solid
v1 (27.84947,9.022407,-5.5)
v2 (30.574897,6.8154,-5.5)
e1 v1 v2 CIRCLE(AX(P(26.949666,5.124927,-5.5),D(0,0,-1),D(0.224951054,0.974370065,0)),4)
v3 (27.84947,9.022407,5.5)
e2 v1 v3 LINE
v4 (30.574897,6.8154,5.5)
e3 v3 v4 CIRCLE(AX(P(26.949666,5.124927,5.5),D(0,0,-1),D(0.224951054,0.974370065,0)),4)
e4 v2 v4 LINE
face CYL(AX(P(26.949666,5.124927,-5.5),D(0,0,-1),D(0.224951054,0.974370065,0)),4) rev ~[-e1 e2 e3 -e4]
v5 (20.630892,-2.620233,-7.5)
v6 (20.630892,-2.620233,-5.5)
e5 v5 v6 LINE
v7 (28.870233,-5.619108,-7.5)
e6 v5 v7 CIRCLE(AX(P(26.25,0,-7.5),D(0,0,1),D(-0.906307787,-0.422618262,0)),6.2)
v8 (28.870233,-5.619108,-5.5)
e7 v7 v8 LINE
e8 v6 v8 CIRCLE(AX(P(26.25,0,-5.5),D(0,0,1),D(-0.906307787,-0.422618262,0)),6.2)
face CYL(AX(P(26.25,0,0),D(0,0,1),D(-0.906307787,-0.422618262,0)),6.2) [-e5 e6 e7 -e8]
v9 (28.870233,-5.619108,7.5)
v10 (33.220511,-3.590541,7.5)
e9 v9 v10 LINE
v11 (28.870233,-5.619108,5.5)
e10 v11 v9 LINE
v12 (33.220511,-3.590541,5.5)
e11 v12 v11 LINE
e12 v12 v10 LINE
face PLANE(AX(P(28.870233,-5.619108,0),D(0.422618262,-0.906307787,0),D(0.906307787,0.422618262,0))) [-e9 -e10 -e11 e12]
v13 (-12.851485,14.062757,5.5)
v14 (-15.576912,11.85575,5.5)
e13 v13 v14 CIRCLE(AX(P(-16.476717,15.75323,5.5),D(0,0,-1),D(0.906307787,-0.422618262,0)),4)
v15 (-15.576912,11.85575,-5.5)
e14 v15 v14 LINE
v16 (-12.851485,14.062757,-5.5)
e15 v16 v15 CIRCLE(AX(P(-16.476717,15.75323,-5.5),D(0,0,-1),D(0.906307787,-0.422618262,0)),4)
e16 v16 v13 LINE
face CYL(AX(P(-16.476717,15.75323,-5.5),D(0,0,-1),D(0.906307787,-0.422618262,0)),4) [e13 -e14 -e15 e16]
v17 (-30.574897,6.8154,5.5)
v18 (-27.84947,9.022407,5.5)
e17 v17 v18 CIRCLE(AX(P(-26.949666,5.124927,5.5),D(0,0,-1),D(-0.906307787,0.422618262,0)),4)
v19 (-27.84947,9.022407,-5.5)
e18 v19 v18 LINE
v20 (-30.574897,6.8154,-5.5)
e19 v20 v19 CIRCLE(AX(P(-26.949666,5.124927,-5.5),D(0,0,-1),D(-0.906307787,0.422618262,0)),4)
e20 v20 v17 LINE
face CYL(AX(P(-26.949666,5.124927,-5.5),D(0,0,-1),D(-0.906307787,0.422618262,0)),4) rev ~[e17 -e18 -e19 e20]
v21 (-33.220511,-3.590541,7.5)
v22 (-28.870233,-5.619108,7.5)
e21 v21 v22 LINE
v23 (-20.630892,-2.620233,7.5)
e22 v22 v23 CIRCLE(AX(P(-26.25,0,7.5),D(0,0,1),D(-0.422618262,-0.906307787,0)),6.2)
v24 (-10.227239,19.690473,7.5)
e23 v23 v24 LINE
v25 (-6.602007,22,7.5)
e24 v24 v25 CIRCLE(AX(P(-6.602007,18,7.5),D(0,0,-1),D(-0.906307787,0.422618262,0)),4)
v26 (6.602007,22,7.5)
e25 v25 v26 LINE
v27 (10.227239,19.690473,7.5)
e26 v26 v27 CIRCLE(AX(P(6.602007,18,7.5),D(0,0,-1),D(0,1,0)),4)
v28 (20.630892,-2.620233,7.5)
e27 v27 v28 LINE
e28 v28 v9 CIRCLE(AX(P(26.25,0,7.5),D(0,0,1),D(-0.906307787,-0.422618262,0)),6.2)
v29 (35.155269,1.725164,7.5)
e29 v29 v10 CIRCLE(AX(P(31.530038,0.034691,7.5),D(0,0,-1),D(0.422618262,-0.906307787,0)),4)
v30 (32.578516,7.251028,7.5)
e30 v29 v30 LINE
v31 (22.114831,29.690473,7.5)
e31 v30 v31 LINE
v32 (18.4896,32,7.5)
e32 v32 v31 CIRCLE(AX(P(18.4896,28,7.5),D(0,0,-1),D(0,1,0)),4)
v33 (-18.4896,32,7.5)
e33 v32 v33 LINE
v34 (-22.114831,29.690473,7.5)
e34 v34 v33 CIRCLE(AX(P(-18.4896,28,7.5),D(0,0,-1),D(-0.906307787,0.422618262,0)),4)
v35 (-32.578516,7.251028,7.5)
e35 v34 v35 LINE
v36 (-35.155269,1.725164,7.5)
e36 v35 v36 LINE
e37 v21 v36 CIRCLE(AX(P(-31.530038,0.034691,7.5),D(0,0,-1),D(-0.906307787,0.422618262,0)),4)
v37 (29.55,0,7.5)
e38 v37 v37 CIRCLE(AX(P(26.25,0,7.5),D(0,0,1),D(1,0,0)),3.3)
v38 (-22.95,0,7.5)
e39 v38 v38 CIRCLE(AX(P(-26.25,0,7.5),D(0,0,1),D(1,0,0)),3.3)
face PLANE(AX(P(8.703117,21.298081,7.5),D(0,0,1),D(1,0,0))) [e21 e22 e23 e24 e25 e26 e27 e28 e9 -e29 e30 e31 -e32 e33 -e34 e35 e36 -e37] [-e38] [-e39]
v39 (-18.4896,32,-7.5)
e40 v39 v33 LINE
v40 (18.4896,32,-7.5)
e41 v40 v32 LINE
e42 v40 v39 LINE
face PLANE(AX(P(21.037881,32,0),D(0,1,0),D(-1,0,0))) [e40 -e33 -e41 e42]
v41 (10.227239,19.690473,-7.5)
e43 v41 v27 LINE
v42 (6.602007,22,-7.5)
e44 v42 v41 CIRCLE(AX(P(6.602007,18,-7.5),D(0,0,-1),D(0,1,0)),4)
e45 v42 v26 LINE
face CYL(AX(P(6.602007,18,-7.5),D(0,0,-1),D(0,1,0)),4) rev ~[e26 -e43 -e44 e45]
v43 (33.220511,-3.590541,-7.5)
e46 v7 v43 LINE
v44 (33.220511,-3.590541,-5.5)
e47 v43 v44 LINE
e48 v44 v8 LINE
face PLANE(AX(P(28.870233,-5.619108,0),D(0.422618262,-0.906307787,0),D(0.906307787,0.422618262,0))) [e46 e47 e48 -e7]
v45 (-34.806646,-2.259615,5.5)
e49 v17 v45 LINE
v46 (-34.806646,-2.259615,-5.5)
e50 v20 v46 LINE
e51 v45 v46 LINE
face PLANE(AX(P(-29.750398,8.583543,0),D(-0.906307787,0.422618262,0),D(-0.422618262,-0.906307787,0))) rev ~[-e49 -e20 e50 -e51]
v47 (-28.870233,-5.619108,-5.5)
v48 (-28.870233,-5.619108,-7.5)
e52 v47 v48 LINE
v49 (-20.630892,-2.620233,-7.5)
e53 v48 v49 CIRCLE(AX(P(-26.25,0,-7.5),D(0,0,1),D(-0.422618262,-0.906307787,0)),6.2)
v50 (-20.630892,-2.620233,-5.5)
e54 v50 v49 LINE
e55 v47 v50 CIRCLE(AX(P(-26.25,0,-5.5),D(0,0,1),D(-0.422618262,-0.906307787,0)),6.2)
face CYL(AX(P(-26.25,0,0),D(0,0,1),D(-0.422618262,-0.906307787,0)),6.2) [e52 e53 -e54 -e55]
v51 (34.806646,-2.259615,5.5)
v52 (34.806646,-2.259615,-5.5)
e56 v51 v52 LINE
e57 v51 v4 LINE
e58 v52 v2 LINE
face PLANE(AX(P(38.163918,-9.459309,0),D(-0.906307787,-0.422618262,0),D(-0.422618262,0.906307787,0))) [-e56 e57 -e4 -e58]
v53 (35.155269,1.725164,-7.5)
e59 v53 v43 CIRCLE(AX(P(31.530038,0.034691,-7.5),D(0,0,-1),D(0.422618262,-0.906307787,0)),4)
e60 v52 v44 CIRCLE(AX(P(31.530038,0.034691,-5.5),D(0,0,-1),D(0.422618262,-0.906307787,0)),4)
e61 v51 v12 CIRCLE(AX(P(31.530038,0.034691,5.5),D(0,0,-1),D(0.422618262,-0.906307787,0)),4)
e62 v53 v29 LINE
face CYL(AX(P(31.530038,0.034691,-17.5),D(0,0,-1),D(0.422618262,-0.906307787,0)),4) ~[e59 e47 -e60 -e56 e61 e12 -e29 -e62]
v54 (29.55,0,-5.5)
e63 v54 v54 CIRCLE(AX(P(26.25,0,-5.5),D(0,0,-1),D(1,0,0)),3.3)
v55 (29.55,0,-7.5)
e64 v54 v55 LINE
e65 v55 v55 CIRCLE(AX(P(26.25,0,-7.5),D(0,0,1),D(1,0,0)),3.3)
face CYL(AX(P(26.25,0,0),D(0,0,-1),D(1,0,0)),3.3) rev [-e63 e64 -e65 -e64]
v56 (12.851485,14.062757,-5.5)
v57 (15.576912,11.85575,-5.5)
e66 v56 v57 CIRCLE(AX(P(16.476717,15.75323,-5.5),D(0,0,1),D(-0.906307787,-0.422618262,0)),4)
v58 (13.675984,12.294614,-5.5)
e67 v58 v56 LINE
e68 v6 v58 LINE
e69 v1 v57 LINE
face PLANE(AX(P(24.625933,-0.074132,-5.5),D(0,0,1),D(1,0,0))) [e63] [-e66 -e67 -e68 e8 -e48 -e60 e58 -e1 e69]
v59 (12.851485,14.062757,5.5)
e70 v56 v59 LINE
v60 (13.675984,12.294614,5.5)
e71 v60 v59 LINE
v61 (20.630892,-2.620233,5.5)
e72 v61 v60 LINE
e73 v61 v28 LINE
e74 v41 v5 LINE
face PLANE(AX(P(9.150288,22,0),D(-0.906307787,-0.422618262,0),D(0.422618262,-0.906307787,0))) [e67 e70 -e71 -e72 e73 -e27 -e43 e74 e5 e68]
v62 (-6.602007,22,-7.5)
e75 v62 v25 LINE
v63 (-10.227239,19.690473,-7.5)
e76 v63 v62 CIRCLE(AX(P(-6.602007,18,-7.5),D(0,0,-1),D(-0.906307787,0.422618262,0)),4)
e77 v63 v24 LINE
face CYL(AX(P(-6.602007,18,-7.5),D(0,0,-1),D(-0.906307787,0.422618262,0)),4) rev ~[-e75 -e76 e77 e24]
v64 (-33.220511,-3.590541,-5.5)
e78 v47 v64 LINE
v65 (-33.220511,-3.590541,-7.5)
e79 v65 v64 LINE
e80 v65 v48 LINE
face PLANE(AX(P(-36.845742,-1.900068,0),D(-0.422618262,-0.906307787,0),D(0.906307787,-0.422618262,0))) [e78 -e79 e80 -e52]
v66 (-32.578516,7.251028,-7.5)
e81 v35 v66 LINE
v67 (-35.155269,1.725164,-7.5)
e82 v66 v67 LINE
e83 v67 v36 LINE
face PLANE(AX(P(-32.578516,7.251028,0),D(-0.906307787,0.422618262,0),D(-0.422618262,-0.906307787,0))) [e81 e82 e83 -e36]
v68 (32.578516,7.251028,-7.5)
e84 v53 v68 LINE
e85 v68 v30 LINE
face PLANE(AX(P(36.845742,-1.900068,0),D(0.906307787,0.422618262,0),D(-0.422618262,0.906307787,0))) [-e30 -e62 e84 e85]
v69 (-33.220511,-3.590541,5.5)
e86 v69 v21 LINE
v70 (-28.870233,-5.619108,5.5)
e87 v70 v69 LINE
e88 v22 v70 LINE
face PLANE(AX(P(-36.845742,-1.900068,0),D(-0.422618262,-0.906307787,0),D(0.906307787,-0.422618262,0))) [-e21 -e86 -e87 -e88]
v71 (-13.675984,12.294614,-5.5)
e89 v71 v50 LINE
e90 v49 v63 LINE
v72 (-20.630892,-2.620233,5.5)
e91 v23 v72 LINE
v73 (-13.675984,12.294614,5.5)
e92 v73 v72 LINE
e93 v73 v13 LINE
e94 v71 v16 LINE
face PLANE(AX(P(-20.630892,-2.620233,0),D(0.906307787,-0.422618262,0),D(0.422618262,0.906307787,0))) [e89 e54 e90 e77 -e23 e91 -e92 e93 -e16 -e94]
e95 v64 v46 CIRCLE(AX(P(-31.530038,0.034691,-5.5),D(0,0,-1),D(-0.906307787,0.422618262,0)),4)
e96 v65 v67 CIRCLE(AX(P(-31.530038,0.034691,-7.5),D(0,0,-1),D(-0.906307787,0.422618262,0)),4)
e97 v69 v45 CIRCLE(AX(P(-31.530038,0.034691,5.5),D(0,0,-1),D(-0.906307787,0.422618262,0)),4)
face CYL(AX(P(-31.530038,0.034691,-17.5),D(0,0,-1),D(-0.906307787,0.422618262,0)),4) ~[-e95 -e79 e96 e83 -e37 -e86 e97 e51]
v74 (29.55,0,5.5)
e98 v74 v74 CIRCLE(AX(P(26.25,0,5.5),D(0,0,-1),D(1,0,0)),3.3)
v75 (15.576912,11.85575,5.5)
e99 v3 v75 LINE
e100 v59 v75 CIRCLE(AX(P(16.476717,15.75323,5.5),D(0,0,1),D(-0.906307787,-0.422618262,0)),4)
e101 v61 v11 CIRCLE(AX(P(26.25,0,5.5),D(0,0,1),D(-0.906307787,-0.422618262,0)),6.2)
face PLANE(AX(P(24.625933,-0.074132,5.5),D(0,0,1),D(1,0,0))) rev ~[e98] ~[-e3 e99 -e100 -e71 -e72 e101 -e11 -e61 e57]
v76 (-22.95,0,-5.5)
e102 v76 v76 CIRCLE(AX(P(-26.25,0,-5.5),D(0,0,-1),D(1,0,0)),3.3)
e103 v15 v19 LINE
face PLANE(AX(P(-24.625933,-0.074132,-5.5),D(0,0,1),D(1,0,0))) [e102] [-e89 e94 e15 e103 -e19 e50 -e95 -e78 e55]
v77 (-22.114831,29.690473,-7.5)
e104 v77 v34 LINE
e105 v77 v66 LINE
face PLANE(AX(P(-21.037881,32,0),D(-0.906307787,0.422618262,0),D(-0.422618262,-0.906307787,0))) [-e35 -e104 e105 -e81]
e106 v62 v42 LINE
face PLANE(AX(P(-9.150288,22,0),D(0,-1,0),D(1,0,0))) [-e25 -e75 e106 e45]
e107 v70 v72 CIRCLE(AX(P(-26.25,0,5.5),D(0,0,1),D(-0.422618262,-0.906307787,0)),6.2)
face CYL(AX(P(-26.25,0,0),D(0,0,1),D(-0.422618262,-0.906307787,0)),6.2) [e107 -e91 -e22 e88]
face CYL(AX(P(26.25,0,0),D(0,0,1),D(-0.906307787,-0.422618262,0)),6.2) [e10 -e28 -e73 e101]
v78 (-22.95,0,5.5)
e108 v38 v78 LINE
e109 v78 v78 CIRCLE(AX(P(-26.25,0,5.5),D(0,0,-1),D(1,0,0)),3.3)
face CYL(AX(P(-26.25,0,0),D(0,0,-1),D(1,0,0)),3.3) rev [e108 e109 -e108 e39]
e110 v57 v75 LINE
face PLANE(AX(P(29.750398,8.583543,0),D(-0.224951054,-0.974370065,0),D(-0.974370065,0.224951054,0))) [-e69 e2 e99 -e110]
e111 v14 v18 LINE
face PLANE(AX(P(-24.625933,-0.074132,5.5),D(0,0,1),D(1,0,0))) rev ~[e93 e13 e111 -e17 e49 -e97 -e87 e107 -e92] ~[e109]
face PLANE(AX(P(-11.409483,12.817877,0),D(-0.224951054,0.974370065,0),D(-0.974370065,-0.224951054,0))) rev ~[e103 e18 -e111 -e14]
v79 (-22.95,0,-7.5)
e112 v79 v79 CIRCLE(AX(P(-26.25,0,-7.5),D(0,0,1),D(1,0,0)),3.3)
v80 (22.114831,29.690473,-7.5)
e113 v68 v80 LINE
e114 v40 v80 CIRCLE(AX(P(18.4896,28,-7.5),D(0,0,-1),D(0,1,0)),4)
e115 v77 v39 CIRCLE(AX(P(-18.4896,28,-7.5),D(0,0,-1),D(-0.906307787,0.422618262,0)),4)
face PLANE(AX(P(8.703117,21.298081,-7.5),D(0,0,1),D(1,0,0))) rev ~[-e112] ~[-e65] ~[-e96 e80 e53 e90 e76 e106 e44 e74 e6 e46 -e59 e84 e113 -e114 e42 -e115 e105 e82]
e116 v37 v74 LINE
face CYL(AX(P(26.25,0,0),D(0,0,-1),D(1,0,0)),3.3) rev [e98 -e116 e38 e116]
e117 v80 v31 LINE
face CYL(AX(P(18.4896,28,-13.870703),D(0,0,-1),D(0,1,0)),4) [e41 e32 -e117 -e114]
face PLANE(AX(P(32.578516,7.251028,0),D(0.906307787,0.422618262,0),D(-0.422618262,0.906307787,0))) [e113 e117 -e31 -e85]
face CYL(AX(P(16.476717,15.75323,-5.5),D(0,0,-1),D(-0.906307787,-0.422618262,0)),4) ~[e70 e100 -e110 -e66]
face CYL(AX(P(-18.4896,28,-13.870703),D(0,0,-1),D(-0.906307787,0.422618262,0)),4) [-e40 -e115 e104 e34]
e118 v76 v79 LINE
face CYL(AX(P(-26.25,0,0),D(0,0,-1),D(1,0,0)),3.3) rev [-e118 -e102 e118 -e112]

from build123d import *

# Parameters (mm, degrees)
F1_R        = 3.3
F2_DEPTH    = 7.5
F0_R        = 3.3
F3_DEPTH    = 7.501
F5_DEPTH    = 5.5
F6_T1_DEPTH = 15
F6_T3_DEPTH = 11
F6_T5_DEPTH = 11
F6_T7_DEPTH = 35
F6_T9_DEPTH = 27.7414052161


# Not quite as in the source:
# - a fillet or chamfer that OpenCascade refuses, or shapes differently, is made with other operations: its cross-section is extruded or revolved along the edge and cut away or added
# - a feature names something its author has since deleted; it is built from what else it names


with BuildPart() as f2:
    # F1 (on Top) → F2 (new body, symmetric)
    with BuildSketch(Plane.XY):
        with BuildLine():
            Line((-9.150288423, 22), (0, 22))
            Line((0, 22), (9.150288423, 22))
            Line((9.150288423, 22), (20.6308917204, -2.6202332228))
            ThreePointArc((20.6308917204, -2.6202332228), (24.1294751114, -5.8260942489), (28.8702332228, -5.6191082796))
            Line((28.8702332228, -5.6191082796), (36.8457417487, -1.9000675763))
            Line((36.8457417487, -1.9000675763), (32.5785159717, 7.2510276339))
            Line((32.5785159717, 7.2510276339), (21.0378806259, 32))
            Line((21.0378806259, 32), (0, 32))
            Line((0, 32), (-21.0378806259, 32))
            Line((-21.0378806259, 32), (-32.5785159717, 7.2510276339))
            Line((-32.5785159717, 7.2510276339), (-36.8457417487, -1.9000675763))
            Line((-36.8457417487, -1.9000675763), (-28.8702332228, -5.6191082796))
            ThreePointArc((-28.8702332228, -5.6191082796), (-24.1294751114, -5.8260942489), (-20.6308917204, -2.6202332228))
            Line((-20.6308917204, -2.6202332228), (-9.150288423, 22))
        make_face()
        with Locations((-26.25, 0)):
            Circle(F1_R, mode=Mode.SUBTRACT)
        with Locations((26.25, 0)):
            Circle(F1_R, mode=Mode.SUBTRACT)
    extrude(amount=F2_DEPTH, both=True)

    # F0 (on Top) → F3 (cut, through all)
    with BuildSketch(Plane.XY):
        with Locations((26.25, 0)):
            Circle(F0_R)
        with Locations((-26.25, 0)):
            Circle(F0_R)
    extrude(amount=F3_DEPTH, mode=Mode.SUBTRACT)

    # F4 (on Top) → F5 (cut, symmetric)
    with BuildSketch(Plane.XY):
        Polygon((38.163918051, -9.4593089454), (29.7503979029, 8.5835432382), (11.4094827275, 12.8178771483), (24.044580395, -14.2781772408), align=None)
        Polygon((-29.7503979029, 8.5835432382), (-38.163918051, -9.4593089454), (-24.044580395, -14.2781772408), (-11.4094827275, 12.8178771483), align=None)
    extrude(amount=F5_DEPTH, both=True, mode=Mode.SUBTRACT)

    # F6: fillet of radius 4 on 10 edges, made by hand

    # F6_s2 → F6_t1 (join)
    with BuildSketch(Plane.XY.offset(-7.5)):
        with BuildLine():
            ThreePointArc((6.6020073798, 22), (8.7512058132, 21.3735657833), (10.2272385279, 19.690473047))
            Line((10.2272385279, 19.690473047), (9.150288423, 22))
            Line((9.150288423, 22), (6.6020073798, 22))
        make_face()
        with BuildLine():
            ThreePointArc((-10.2272385279, 19.690473047), (-8.7512058132, 21.3735657833), (-6.6020073798, 22))
            Line((-6.6020073798, 22), (-9.150288423, 22))
            Line((-9.150288423, 22), (-10.2272385279, 19.690473047))
        make_face()
    extrude(amount=F6_T1_DEPTH)

    # F6_s4 → F6_t3 (join)
    with BuildSketch(Plane.XY.offset(-5.5)):
        with BuildLine():
            ThreePointArc((27.8494697672, 9.0224070783), (29.466947114, 8.233510665), (30.574896698, 6.8153998661))
            Line((30.574896698, 6.8153998661), (29.7503979029, 8.5835432382))
            Line((29.7503979029, 8.5835432382), (27.8494697672, 9.0224070783))
        make_face()
        with BuildLine():
            ThreePointArc((-30.574896698, 6.8153998661), (-29.466947114, 8.233510665), (-27.8494697672, 9.0224070783))
            Line((-27.8494697672, 9.0224070783), (-29.7503979029, 8.5835432382))
            Line((-29.7503979029, 8.5835432382), (-30.574896698, 6.8153998661))
        make_face()
    extrude(amount=F6_T3_DEPTH)

    # F6_s6 → F6_t5 (cut)
    with BuildSketch(Plane.XY.offset(-5.5)):
        with BuildLine():
            ThreePointArc((12.8514854221, 14.0627574212), (13.9594350061, 12.6446466223), (15.5769123529, 11.855750209))
            Line((15.5769123529, 11.855750209), (13.6759842172, 12.2946140492))
            Line((13.6759842172, 12.2946140492), (12.8514854221, 14.0627574212))
        make_face()
        with BuildLine():
            ThreePointArc((-12.8514854221, 14.0627574212), (-13.9594350061, 12.6446466223), (-15.5769123529, 11.855750209))
            Line((-15.5769123529, 11.855750209), (-13.6759842172, 12.2946140492))
            Line((-13.6759842172, 12.2946140492), (-12.8514854221, 14.0627574212))
        make_face()
    extrude(amount=F6_T5_DEPTH, mode=Mode.SUBTRACT)

    # F6_s8 → F6_t7 (cut)
    with BuildSketch(Plane.XY.offset(-17.5)):
        with BuildLine():
            ThreePointArc((33.2205106006, -3.5905406233), (35.2888080367, -1.3333900484), (35.1552687018, 1.7251635718))
            Line((35.1552687018, 1.7251635718), (36.8457417487, -1.9000675763))
            Line((36.8457417487, -1.9000675763), (33.2205106006, -3.5905406233))
        make_face()
        with BuildLine():
            ThreePointArc((-35.1552687018, 1.7251635718), (-35.2888080367, -1.3333900484), (-33.2205106006, -3.5905406233))
            Line((-33.2205106006, -3.5905406233), (-36.8457417487, -1.9000675763))
            Line((-36.8457417487, -1.9000675763), (-35.1552687018, 1.7251635718))
        make_face()
    extrude(amount=F6_T7_DEPTH, mode=Mode.SUBTRACT)

    # F6_s10 → F6_t9 (cut)
    with BuildSketch(Plane.XY.offset(-13.8707026081)):
        with BuildLine():
            ThreePointArc((18.4895995827, 32), (20.6387980161, 31.3735657833), (22.1148307308, 29.690473047))
            Line((22.1148307308, 29.690473047), (21.0378806259, 32))
            Line((21.0378806259, 32), (18.4895995827, 32))
        make_face()
        with BuildLine():
            ThreePointArc((-22.1148307308, 29.690473047), (-20.6387980161, 31.3735657833), (-18.4895995827, 32))
            Line((-18.4895995827, 32), (-21.0378806259, 32))
            Line((-21.0378806259, 32), (-22.1148307308, 29.690473047))
        make_face()
    extrude(amount=F6_T9_DEPTH, mode=Mode.SUBTRACT)


solid = f2.part
